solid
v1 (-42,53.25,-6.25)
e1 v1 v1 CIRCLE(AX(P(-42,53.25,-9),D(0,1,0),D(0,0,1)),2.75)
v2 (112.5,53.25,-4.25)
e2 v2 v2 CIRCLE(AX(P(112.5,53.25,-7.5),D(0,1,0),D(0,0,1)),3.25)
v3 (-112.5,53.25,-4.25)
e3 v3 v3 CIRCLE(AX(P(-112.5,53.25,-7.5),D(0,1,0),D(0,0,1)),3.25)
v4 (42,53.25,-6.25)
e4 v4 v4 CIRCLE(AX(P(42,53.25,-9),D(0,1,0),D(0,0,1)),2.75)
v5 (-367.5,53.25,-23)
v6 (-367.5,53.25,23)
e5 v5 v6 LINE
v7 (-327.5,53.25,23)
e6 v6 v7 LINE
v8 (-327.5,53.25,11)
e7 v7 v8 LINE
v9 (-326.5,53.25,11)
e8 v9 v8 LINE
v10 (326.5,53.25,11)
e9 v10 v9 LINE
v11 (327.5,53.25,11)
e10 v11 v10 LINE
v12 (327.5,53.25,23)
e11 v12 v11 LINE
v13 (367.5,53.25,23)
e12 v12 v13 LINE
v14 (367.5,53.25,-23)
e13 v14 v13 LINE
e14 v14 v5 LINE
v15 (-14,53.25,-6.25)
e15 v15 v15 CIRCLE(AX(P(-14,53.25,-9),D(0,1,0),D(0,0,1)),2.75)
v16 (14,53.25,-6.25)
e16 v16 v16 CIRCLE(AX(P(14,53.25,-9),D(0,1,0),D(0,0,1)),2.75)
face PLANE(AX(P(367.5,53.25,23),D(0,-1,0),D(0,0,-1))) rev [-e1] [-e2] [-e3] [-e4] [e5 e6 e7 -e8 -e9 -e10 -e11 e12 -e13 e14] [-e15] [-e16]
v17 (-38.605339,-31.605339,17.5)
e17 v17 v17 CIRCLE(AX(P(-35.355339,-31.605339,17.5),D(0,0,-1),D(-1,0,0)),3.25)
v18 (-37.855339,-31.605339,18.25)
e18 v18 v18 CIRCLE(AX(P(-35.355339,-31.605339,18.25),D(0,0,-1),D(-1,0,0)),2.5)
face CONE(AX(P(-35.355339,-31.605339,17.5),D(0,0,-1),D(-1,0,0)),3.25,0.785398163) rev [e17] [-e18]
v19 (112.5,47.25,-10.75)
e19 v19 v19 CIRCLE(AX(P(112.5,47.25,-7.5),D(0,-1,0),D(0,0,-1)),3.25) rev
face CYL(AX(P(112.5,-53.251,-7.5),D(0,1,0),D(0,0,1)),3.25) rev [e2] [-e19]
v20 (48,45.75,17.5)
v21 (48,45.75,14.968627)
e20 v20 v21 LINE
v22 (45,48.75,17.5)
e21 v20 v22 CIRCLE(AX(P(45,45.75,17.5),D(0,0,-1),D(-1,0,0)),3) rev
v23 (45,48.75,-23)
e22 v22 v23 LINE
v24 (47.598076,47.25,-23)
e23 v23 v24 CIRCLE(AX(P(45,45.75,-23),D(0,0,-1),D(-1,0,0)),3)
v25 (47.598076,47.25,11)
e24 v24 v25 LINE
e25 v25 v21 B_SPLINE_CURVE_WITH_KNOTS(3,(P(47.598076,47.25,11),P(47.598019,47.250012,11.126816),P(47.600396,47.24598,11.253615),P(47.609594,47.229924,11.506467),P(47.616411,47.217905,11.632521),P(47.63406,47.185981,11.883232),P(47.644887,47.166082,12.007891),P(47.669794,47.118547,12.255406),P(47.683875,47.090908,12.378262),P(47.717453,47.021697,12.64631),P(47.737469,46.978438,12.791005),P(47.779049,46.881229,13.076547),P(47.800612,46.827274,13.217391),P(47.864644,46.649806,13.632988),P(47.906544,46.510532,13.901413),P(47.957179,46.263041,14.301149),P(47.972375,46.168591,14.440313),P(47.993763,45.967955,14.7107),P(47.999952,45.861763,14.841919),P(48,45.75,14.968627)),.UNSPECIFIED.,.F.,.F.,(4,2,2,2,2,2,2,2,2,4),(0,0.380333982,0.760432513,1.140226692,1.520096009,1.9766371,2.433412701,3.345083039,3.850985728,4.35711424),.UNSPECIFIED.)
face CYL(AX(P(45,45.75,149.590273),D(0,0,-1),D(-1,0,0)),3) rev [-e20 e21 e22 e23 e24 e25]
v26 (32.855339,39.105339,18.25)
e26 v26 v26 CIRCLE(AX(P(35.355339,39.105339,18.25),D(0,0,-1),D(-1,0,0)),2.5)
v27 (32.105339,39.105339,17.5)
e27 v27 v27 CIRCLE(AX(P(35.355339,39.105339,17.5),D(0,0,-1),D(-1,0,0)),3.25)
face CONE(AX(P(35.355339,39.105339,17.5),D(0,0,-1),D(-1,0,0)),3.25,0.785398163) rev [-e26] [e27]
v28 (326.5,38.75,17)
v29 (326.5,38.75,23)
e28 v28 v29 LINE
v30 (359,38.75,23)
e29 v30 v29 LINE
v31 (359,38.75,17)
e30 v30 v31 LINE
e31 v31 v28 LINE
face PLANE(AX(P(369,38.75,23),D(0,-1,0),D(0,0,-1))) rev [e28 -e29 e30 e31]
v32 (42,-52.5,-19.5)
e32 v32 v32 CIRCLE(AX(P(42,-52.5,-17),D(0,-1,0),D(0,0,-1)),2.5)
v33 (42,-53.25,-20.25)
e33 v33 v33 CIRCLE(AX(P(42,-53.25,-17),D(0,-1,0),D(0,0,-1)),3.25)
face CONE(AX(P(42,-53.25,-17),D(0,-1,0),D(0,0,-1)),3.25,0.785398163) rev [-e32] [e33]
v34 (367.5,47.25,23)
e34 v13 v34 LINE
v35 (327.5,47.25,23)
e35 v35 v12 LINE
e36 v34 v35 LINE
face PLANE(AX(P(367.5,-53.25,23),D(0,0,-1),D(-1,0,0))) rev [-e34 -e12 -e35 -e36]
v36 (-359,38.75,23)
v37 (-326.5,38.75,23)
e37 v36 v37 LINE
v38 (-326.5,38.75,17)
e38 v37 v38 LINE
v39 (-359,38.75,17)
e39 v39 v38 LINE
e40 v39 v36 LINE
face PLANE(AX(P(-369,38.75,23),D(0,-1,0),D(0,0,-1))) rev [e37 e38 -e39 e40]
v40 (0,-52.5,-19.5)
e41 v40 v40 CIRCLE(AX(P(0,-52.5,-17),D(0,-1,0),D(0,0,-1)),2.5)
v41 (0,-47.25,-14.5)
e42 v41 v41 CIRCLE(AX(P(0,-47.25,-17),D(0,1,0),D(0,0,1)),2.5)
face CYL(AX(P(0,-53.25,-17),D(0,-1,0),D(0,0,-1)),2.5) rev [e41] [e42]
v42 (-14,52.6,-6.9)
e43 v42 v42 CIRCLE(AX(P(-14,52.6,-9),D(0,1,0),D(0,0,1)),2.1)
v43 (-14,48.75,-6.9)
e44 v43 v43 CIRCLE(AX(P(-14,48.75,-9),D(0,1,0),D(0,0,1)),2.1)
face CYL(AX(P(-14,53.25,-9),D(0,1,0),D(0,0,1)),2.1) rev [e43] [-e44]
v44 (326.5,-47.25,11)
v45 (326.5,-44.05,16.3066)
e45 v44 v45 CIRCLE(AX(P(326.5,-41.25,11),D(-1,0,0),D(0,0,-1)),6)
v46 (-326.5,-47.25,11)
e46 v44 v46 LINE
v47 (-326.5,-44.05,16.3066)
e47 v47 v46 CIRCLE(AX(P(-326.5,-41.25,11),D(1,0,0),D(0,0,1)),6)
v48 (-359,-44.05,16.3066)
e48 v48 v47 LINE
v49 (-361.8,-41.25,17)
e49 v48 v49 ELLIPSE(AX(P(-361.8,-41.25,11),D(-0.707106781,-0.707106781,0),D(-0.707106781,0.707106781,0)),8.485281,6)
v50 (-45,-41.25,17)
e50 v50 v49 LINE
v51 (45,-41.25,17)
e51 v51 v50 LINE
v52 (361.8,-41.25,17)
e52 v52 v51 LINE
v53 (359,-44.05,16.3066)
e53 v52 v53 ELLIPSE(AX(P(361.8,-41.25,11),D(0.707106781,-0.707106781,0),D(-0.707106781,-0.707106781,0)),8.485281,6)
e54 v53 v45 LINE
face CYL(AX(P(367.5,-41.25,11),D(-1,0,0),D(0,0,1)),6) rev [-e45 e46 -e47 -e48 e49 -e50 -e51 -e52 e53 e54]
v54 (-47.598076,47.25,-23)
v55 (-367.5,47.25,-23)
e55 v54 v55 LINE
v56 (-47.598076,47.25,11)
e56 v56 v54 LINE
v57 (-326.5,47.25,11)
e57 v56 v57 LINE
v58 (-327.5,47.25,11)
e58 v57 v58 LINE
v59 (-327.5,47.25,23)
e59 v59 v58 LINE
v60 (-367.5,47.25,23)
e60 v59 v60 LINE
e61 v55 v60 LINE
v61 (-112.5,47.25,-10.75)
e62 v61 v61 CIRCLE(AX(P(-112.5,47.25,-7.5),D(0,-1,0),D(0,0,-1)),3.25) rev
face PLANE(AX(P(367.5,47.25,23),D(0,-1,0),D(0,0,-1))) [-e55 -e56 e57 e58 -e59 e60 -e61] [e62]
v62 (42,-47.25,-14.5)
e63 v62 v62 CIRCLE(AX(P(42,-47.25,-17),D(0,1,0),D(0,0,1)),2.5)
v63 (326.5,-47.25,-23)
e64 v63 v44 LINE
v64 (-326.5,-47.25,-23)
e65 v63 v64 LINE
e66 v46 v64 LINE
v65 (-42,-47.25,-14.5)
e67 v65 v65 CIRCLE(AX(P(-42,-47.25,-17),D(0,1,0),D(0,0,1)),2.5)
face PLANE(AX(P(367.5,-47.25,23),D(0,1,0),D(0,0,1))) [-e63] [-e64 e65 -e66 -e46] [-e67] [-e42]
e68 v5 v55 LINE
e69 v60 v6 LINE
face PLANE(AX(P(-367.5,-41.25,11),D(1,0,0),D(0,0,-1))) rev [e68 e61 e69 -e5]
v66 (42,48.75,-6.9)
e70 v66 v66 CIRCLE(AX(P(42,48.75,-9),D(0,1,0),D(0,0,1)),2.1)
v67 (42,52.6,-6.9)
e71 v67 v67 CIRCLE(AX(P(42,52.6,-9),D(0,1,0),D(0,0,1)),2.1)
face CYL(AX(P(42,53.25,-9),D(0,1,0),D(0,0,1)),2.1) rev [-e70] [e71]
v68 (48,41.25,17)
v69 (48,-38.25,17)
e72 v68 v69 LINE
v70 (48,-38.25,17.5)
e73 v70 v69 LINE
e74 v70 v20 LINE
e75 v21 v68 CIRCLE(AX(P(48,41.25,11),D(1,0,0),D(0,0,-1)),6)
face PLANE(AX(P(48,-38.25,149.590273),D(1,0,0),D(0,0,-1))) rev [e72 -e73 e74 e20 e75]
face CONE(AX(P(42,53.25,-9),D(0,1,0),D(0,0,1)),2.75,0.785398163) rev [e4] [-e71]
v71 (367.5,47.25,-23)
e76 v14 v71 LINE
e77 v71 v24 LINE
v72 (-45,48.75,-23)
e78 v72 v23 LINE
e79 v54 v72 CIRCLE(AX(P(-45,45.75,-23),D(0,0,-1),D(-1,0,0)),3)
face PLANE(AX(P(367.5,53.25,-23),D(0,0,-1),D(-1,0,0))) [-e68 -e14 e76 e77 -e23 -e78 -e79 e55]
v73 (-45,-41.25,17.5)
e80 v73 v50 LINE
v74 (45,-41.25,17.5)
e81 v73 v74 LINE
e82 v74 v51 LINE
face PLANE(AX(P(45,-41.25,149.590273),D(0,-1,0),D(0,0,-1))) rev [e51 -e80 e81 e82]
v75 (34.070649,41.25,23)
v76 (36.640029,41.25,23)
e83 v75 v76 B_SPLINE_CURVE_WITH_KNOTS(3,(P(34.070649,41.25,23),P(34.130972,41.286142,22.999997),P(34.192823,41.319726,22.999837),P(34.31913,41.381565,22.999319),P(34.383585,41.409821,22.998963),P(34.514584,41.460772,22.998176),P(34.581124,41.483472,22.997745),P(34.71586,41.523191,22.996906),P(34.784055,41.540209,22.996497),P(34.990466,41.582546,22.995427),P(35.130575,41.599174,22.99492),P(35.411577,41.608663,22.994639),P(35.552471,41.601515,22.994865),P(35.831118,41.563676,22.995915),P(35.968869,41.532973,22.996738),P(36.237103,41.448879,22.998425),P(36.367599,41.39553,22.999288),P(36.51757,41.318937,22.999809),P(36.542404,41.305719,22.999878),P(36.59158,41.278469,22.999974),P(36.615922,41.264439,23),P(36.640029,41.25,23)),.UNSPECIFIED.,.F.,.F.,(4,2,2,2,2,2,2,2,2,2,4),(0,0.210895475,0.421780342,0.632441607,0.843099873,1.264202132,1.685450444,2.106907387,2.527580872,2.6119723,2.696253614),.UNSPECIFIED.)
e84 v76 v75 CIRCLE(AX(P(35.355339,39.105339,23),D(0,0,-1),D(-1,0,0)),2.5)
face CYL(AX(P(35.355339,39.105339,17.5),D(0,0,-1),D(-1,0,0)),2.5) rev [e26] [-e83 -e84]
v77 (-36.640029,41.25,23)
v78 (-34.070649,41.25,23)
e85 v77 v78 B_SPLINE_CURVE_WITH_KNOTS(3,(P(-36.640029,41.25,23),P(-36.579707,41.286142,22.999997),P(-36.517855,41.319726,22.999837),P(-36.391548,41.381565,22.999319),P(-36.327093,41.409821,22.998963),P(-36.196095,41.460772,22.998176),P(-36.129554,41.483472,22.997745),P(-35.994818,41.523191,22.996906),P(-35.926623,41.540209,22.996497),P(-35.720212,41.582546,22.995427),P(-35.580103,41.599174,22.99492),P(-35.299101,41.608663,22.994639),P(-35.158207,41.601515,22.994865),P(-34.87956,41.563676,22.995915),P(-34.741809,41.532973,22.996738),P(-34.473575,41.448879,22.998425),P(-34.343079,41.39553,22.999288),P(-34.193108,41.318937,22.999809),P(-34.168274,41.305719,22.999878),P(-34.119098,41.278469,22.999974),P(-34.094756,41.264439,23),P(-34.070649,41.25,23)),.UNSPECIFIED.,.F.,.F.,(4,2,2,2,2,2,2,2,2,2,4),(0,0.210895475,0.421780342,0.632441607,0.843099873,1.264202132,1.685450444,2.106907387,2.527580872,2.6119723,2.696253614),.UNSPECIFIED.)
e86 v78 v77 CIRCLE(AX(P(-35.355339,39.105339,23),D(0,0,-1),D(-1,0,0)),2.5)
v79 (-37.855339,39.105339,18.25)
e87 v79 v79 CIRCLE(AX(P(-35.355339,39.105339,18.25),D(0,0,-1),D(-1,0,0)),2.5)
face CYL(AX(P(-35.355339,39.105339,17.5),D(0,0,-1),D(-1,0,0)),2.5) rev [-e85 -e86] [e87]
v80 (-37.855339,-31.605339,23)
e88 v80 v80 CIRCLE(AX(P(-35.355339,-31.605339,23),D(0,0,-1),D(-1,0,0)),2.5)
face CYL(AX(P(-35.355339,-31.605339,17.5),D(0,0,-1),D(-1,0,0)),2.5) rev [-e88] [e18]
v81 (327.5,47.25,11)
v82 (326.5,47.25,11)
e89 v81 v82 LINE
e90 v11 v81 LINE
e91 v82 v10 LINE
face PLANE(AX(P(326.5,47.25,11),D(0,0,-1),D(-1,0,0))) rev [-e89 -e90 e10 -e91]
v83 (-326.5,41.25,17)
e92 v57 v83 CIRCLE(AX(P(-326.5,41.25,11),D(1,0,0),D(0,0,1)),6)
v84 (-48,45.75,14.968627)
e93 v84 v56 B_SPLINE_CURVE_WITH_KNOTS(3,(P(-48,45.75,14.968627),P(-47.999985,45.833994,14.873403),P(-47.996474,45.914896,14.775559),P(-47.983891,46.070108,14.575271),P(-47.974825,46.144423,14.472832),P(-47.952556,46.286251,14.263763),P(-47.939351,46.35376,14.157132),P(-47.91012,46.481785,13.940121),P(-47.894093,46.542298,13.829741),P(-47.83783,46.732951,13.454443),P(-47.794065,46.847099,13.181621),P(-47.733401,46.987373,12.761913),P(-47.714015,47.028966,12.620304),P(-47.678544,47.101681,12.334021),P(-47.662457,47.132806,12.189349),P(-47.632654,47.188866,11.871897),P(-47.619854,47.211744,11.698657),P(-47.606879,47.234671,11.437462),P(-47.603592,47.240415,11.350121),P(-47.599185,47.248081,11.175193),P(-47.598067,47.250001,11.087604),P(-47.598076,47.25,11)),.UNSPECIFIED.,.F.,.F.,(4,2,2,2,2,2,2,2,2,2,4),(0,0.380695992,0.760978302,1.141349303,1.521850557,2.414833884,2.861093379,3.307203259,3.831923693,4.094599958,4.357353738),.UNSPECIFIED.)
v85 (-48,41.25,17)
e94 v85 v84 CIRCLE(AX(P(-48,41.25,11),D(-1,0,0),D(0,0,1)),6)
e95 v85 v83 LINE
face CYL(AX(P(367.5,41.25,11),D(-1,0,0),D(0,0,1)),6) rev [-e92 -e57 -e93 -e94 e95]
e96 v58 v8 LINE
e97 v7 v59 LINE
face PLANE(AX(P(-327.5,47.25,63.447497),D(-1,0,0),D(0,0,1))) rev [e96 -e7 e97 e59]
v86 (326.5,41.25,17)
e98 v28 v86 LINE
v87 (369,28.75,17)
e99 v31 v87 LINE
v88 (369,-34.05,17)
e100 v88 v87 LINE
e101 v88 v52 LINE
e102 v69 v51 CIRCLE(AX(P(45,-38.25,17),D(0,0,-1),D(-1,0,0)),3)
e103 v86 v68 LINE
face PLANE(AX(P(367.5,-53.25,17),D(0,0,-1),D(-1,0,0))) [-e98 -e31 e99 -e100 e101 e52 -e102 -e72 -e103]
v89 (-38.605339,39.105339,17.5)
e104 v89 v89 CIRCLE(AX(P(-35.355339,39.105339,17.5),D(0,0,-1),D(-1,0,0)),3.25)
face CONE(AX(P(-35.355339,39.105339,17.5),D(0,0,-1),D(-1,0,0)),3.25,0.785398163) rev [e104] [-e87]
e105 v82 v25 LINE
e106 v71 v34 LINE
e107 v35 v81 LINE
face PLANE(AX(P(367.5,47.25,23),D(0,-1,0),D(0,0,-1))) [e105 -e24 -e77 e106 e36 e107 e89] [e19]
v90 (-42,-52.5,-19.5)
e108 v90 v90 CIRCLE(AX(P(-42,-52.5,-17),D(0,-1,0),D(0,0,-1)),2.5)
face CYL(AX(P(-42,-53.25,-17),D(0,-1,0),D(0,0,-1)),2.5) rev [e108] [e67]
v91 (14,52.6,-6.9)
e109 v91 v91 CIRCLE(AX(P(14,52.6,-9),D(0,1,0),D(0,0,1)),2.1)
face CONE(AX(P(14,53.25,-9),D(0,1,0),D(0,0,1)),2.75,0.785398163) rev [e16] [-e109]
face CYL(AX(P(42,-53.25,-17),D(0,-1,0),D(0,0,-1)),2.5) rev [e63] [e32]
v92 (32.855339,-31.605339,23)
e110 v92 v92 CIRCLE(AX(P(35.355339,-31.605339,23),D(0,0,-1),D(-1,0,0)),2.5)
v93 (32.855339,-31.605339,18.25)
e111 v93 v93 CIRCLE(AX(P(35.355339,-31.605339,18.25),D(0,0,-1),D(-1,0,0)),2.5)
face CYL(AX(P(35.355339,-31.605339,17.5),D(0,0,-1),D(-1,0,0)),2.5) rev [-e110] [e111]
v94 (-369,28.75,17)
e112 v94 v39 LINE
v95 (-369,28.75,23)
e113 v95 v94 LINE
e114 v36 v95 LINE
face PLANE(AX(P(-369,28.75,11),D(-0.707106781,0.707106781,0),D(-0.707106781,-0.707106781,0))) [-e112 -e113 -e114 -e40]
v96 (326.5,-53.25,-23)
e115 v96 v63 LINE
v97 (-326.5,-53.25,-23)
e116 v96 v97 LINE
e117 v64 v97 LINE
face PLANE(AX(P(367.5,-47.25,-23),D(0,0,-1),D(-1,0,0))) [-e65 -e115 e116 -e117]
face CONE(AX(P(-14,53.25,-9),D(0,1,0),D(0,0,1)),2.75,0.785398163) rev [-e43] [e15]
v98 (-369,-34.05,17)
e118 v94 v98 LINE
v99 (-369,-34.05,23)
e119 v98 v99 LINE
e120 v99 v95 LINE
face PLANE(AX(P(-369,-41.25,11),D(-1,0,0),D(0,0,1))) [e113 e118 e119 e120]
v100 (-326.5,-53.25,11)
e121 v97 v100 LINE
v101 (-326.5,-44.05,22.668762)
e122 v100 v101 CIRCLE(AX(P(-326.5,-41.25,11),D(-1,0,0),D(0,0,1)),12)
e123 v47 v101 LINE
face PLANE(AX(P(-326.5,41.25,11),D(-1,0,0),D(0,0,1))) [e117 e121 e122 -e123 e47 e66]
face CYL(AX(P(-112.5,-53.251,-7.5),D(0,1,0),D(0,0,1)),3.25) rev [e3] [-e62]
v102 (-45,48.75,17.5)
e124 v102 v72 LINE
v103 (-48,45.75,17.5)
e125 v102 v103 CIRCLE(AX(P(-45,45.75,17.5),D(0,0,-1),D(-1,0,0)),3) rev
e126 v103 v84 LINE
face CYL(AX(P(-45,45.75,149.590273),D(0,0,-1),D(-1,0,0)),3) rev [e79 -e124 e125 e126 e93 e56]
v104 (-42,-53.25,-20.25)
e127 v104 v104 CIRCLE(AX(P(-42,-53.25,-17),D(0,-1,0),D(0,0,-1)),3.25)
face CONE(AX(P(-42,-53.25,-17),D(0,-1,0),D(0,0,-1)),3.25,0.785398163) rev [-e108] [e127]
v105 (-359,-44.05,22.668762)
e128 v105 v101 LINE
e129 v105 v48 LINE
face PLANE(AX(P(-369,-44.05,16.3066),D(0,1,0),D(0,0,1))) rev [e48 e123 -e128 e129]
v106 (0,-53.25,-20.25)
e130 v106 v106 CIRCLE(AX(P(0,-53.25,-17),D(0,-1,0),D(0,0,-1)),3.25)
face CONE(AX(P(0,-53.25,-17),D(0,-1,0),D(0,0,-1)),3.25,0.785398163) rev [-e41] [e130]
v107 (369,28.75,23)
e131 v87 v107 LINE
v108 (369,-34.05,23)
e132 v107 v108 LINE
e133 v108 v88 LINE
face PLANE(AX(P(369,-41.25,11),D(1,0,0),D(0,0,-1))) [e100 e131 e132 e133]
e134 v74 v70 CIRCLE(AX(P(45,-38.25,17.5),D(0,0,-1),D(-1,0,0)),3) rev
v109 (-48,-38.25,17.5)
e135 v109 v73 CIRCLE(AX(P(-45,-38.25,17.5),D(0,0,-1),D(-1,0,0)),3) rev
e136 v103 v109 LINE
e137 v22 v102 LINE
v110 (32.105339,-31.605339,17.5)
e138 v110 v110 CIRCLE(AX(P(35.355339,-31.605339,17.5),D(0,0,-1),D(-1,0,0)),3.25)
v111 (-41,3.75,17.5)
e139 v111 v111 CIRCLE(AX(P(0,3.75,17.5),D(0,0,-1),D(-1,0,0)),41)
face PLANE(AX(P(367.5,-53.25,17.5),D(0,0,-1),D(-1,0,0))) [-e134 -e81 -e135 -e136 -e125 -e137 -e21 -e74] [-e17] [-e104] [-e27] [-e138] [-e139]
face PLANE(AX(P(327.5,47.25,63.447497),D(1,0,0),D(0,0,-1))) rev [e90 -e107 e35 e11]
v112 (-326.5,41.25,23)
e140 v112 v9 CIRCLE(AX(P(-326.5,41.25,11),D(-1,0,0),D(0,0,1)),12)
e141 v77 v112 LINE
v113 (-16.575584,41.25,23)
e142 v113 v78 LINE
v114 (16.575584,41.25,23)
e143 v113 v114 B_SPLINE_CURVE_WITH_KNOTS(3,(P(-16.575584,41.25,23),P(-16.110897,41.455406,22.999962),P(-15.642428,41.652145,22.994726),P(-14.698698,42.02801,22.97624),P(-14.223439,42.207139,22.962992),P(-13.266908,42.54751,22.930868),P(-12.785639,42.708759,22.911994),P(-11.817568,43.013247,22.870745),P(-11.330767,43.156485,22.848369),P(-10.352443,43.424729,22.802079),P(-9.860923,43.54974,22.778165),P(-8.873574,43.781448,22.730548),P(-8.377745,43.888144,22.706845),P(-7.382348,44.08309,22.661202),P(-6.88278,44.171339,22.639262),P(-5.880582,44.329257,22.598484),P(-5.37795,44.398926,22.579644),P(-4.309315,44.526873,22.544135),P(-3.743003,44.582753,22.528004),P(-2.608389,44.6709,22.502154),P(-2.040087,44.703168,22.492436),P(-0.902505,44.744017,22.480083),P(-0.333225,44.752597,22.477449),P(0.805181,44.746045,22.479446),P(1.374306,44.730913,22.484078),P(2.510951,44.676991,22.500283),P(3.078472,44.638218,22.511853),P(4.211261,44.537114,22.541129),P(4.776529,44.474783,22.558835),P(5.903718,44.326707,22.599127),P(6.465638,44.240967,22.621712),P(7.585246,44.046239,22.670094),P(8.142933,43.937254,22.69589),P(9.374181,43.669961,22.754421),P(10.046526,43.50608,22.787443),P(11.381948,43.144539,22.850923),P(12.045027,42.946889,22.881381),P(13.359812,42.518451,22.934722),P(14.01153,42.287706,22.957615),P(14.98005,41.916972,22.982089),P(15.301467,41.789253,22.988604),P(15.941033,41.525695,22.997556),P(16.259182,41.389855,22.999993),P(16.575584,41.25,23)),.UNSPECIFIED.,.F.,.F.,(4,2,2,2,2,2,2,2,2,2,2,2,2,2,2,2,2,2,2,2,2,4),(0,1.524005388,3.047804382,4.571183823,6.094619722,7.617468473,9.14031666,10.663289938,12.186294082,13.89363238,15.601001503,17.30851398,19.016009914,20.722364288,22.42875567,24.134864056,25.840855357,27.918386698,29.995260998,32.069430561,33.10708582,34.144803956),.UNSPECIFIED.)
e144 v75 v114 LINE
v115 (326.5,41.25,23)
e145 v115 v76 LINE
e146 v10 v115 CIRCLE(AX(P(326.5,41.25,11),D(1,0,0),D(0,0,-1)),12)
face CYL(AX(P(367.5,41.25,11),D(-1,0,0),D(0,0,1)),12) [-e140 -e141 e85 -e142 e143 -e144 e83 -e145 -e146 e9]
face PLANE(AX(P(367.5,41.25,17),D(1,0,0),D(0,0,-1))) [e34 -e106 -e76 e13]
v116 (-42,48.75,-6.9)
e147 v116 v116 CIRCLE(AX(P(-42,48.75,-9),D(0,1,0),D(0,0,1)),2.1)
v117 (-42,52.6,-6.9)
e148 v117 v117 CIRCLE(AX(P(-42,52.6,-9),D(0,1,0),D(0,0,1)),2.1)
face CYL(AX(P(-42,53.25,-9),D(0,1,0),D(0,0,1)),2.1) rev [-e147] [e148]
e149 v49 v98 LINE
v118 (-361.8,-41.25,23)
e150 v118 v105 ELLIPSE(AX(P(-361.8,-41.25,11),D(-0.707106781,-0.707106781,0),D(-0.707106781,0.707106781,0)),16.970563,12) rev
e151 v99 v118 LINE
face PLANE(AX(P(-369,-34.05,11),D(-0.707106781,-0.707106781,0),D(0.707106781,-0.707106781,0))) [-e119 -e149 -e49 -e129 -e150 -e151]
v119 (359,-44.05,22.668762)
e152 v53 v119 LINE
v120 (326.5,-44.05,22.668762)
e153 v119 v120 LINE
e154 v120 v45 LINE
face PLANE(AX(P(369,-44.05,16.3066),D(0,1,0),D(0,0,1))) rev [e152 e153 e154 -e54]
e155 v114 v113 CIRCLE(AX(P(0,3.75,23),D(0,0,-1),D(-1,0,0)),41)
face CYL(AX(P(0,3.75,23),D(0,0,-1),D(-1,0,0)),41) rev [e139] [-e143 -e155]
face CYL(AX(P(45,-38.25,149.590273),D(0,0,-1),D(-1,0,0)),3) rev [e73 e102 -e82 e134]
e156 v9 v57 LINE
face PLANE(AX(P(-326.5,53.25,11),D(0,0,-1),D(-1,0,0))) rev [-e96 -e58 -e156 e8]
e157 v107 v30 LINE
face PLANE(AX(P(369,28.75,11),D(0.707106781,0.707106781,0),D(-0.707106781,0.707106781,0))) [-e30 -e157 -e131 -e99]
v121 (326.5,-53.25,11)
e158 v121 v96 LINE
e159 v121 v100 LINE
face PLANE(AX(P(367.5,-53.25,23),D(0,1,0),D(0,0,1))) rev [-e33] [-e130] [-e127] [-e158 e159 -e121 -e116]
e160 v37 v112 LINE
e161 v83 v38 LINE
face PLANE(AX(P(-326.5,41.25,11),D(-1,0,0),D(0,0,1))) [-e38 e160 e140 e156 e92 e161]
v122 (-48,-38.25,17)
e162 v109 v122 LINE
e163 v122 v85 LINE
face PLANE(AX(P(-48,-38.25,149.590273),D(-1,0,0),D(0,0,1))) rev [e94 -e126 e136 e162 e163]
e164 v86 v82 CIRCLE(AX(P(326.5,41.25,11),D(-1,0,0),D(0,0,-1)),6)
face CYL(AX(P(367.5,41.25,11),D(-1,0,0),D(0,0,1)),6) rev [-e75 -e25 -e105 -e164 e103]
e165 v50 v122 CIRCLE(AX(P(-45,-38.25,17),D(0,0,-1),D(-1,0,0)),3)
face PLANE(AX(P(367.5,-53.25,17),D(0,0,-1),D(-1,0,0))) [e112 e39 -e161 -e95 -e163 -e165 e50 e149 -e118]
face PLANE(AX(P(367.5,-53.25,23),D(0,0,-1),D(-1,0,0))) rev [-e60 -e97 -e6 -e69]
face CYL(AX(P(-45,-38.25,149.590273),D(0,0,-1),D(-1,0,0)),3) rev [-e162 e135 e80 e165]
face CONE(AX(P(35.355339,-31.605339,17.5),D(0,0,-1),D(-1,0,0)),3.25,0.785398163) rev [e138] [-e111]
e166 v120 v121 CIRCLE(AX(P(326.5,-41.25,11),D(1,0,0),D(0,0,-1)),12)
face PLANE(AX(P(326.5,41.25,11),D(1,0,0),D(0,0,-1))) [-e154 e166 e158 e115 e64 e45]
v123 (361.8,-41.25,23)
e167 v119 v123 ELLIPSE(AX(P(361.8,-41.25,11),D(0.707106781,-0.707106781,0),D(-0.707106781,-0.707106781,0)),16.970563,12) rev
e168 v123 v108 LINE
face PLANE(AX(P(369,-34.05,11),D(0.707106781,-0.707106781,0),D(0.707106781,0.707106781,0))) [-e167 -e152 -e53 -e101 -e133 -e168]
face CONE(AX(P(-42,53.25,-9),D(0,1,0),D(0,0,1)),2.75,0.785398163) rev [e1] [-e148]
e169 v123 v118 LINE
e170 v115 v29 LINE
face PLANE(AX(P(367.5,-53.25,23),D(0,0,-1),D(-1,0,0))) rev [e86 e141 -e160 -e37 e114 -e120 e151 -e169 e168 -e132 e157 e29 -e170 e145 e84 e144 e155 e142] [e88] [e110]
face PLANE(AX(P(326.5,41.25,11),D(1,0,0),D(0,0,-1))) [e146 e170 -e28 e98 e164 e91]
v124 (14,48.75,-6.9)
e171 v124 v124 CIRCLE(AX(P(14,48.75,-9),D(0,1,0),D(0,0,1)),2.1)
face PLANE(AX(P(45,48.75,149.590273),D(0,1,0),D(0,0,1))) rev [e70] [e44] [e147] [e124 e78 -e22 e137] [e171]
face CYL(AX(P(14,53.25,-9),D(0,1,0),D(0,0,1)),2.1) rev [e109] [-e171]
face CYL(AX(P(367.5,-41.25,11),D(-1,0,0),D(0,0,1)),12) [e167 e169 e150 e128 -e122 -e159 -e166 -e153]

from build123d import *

# Parameters (mm, degrees)
SM_BASE_FLANGE_1_DEPTH = 367.5
CUT_EXTRUDE_1337_DEPTH = 40.5
CUT_EXTRUDE_2_DEPTH    = 41
CUT_EXTRUDE_START      = -41
CUT_EXTRUDE_3_DEPTH    = 41
SKETCH_6_W             = 40
SKETCH_6_H             = 6
EXTRUDE_4_DEPTH        = 12
EXTRUDE_START          = 42.5
EXTRUDE_5_DEPTH        = 42.5
EXTRUDE_6_DEPTH        = 42.5
CHAMFER_1_SIZE         = 10
M6X1_01_D              = 5
M6X1_01_CSINK_D        = 6.5
M6X1_01_CSINK_ANGLE    = 90
SKETCH_10_R            = 41
CUT_EXTRUDE_7_DEPTH    = 376.015749694
M5X0_81_D              = 4.2
M5X0_81_DEPTH          = 4.5
M5X0_81_CSINK_D        = 5.5
M5X0_81_CSINK_ANGLE    = 90
M6X1_02_D              = 5
M6X1_02_DEPTH          = 6
M6X1_02_CSINK_D        = 6.5
M6X1_02_CSINK_ANGLE    = 90
CUT_EXTRUDE_8_REACH    = 386.75
SKETCH_17_R            = 3.25


# Sheet-metal steps are written as plain solids
with BuildPart() as part:
    # Sketch 1 → Базовая кромка1 (new, symmetric)
    with BuildSketch(Plane(origin=(0, 0, 0), x_dir=(0, 0, -1), z_dir=(1, 0, 0))):
        with BuildLine():
            Line((23, 53.25), (-11, 53.25))
            ThreePointArc((-11, 53.25), (-19.485281374, 49.735281374), (-23, 41.25))
            Line((-23, 41.25), (-23, -41.25))
            ThreePointArc((-23, -41.25), (-19.485281374, -49.735281374), (-11, -53.25))
            Line((-11, -53.25), (23, -53.25))
            Line((23, -53.25), (23, -47.25))
            Line((23, -47.25), (-11, -47.25))
            ThreePointArc((-11, -47.25), (-15.242640687, -45.492640687), (-17, -41.25))
            Line((-17, -41.25), (-17, 41.25))
            ThreePointArc((-17, 41.25), (-15.242640687, 45.492640687), (-11, 47.25))
            Line((-11, 47.25), (23, 47.25))
            Line((23, 47.25), (23, 53.25))
        make_face()
    extrude(amount=SM_BASE_FLANGE_1_DEPTH, both=True)

    # Эскиз3 → Cut-Extrude 1337 (cut)
    with BuildSketch(Plane(origin=(0, 0, -23), x_dir=(-1, 0, 0), z_dir=(0, 0, -1))):
        with BuildLine():
            Line((-45, -41.25), (45, -41.25))
            ThreePointArc((45, -41.25), (47.121320344, -40.371320344), (48, -38.25))
            Line((48, -38.25), (48, 45.75))
            ThreePointArc((48, 45.75), (47.121320344, 47.871320344), (45, 48.75))
            Line((45, 48.75), (-45, 48.75))
            ThreePointArc((-45, 48.75), (-47.121320344, 47.871320344), (-48, 45.75))
            Line((-48, 45.75), (-48, -38.25))
            ThreePointArc((-48, -38.25), (-47.121320344, -40.371320344), (-45, -41.25))
        make_face()
    extrude(amount=-CUT_EXTRUDE_1337_DEPTH, mode=Mode.SUBTRACT)

    # Эскиз4 → Вытянуть2 (cut)
    with BuildSketch(Plane(origin=(367.5, 0, 0), x_dir=(0, 0, -1), z_dir=(1, 0, 0))):
        with BuildLine():
            Line((-11, 47.25), (-11, 53.25))
            ThreePointArc((-11, 53.25), (-19.485281374, 49.735281374), (-23, 41.25))
            Line((-23, 41.25), (-23, -41.25))
            ThreePointArc((-23, -41.25), (-19.485281374, -49.735281374), (-11, -53.25))
            Line((-11, -53.25), (23, -53.25))
            Line((23, -53.25), (23, -47.25))
            Line((23, -47.25), (-11, -47.25))
            ThreePointArc((-11, -47.25), (-15.242640687, -45.492640687), (-17, -41.25))
            Line((-17, -41.25), (-17, 41.25))
            ThreePointArc((-17, 41.25), (-15.242640687, 45.492640687), (-11, 47.25))
        make_face()
    extrude(amount=-CUT_EXTRUDE_2_DEPTH, mode=Mode.SUBTRACT)

    # Эскиз5 → Вытянуть3 (cut)
    with BuildSketch(Plane.ZY.offset(367.5).offset(CUT_EXTRUDE_START)):
        with BuildLine():
            Line((11, 53.25), (11, 47.25))
            ThreePointArc((11, 47.25), (15.242640687, 45.492640687), (17, 41.25))
            Line((17, 41.25), (17, -41.25))
            ThreePointArc((17, -41.25), (15.242640687, -45.492640687), (11, -47.25))
            Line((11, -47.25), (-23, -47.25))
            Line((-23, -47.25), (-23, -53.25))
            Line((-23, -53.25), (11, -53.25))
            ThreePointArc((11, -53.25), (19.485281374, -49.735281374), (23, -41.25))
            Line((23, -41.25), (23, 41.25))
            ThreePointArc((23, 41.25), (19.485281374, 49.735281374), (11, 53.25))
        make_face()
    extrude(amount=CUT_EXTRUDE_3_DEPTH, mode=Mode.SUBTRACT)

    # Эскиз6 → Вытянуть4 (add)
    with BuildSketch(Plane.XY.offset(11)):
        with Locations((-347.5, 50.25)):
            Rectangle(SKETCH_6_W, SKETCH_6_H)
        with Locations((347.5, 50.25)):
            Rectangle(SKETCH_6_W, SKETCH_6_H)
    extrude(amount=EXTRUDE_4_DEPTH)

    # Эскиз8 → Вытянуть5 (add)
    with BuildSketch(Plane(origin=(326.5, 0, 0), x_dir=(0, 0, -1), z_dir=(1, 0, 0)).offset(EXTRUDE_START)):
        with BuildLine():
            Line((-17, -41.25), (-17, 38.75))
            Line((-17, 38.75), (-23, 38.75))
            Line((-23, 38.75), (-23, -41.25))
            ThreePointArc((-23, -41.25), (-22.916902714, -42.659762285), (-22.668761717, -44.05))
            Line((-22.668761717, -44.05), (-16.306599665, -44.05))
            ThreePointArc((-16.306599665, -44.05), (-16.824070655, -42.692290195), (-17, -41.25))
        make_face()
    extrude(amount=-EXTRUDE_5_DEPTH)

    # Эскиз9 → Вытянуть6 (add)
    with BuildSketch(Plane.ZY.offset(326.5)):
        with BuildLine():
            Line((17, 38.75), (17, -41.25))
            ThreePointArc((17, -41.25), (16.824070655, -42.692290195), (16.306599665, -44.05))
            Line((16.306599665, -44.05), (22.668761717, -44.05))
            ThreePointArc((22.668761717, -44.05), (22.916902714, -42.659762285), (23, -41.25))
            Line((23, -41.25), (23, 38.75))
            Line((23, 38.75), (17, 38.75))
        make_face()
    extrude(amount=EXTRUDE_6_DEPTH)

    # Фаска1
    chamfer_1_edges = [part.edges().sort_by_distance(p)[0] for p in [
        (-369, 38.75, 20),
        (-369, -44.05, 19.487680691),
        (369, 38.75, 20),
        (369, -44.05, 19.487680691),
    ]]
    chamfer(chamfer_1_edges, length=CHAMFER_1_SIZE)

    # Отверстие обработанное метчиком M6x1.01 (through all)
    with Locations(Plane(origin=(0, 0, 17.5), x_dir=(-1, 0, 0), z_dir=(0, 0, -1))):
        with Locations((-35.355339059, 39.105339059), (35.355339059, 39.105339059), (35.355339059, -31.605339059), (-35.355339059, -31.605339059)):
            CounterSinkHole(M6X1_01_D / 2, M6X1_01_CSINK_D / 2, counter_sink_angle=M6X1_01_CSINK_ANGLE)

    # Эскиз10 → Вытянуть7 (cut, through all)
    with BuildSketch(Plane(origin=(0, 0, 17.5), x_dir=(-1, 0, 0), z_dir=(0, 0, -1))):
        with Locations((0, 3.75)):
            Circle(SKETCH_10_R)
    extrude(amount=-CUT_EXTRUDE_7_DEPTH, mode=Mode.SUBTRACT)

    # Отверстие обработанное метчиком M5x0.81
    with Locations(Plane(origin=(0, 53.25, 0), x_dir=(-1, 0, 0), z_dir=(0, 1, 0))):
        with Locations((42, -9), (-42, -9), (-14, -9), (14, -9)):
            CounterSinkHole(M5X0_81_D / 2, M5X0_81_CSINK_D / 2, depth=M5X0_81_DEPTH, counter_sink_angle=M5X0_81_CSINK_ANGLE)

    # Отверстие обработанное метчиком M6x1.02
    with Locations(Plane.XZ.offset(53.25)):
        with Locations((0, -17), (-42, -17), (42, -17)):
            CounterSinkHole(M6X1_02_D / 2, M6X1_02_CSINK_D / 2, depth=M6X1_02_DEPTH, counter_sink_angle=M6X1_02_CSINK_ANGLE)

    # Эскиз17 → Вытянуть8 (cut, up to next)
    with BuildSketch(Plane(origin=(0, 53.25, 0), x_dir=(1, 0, 0), z_dir=(0, 1, 0)), mode=Mode.PRIVATE) as cut_extrude_8_sk1:
        with Locations(Location((-112.5, 7.5, 0), (0, 0, 270))):
            Circle(SKETCH_17_R)
    cut_extrude_8_tool1 = extrude(cut_extrude_8_sk1.sketch, amount=-CUT_EXTRUDE_8_REACH, mode=Mode.PRIVATE) & part.part
    # Эскиз17 → Вытянуть8 (cut, up to next)
    with BuildSketch(Plane(origin=(0, 53.25, 0), x_dir=(1, 0, 0), z_dir=(0, 1, 0)), mode=Mode.PRIVATE) as cut_extrude_8_sk2:
        with Locations(Location((112.5, 7.5, 0), (0, 0, 270))):
            Circle(SKETCH_17_R)
    cut_extrude_8_tool2 = extrude(cut_extrude_8_sk2.sketch, amount=-CUT_EXTRUDE_8_REACH, mode=Mode.PRIVATE) & part.part
    add(cut_extrude_8_tool1.solids().sort_by_distance((-112.5, 53.25, -7.5))[0], mode=Mode.SUBTRACT)
    add(cut_extrude_8_tool2.solids().sort_by_distance((112.5, 53.25, -7.5))[0], mode=Mode.SUBTRACT)


solid = part.part
